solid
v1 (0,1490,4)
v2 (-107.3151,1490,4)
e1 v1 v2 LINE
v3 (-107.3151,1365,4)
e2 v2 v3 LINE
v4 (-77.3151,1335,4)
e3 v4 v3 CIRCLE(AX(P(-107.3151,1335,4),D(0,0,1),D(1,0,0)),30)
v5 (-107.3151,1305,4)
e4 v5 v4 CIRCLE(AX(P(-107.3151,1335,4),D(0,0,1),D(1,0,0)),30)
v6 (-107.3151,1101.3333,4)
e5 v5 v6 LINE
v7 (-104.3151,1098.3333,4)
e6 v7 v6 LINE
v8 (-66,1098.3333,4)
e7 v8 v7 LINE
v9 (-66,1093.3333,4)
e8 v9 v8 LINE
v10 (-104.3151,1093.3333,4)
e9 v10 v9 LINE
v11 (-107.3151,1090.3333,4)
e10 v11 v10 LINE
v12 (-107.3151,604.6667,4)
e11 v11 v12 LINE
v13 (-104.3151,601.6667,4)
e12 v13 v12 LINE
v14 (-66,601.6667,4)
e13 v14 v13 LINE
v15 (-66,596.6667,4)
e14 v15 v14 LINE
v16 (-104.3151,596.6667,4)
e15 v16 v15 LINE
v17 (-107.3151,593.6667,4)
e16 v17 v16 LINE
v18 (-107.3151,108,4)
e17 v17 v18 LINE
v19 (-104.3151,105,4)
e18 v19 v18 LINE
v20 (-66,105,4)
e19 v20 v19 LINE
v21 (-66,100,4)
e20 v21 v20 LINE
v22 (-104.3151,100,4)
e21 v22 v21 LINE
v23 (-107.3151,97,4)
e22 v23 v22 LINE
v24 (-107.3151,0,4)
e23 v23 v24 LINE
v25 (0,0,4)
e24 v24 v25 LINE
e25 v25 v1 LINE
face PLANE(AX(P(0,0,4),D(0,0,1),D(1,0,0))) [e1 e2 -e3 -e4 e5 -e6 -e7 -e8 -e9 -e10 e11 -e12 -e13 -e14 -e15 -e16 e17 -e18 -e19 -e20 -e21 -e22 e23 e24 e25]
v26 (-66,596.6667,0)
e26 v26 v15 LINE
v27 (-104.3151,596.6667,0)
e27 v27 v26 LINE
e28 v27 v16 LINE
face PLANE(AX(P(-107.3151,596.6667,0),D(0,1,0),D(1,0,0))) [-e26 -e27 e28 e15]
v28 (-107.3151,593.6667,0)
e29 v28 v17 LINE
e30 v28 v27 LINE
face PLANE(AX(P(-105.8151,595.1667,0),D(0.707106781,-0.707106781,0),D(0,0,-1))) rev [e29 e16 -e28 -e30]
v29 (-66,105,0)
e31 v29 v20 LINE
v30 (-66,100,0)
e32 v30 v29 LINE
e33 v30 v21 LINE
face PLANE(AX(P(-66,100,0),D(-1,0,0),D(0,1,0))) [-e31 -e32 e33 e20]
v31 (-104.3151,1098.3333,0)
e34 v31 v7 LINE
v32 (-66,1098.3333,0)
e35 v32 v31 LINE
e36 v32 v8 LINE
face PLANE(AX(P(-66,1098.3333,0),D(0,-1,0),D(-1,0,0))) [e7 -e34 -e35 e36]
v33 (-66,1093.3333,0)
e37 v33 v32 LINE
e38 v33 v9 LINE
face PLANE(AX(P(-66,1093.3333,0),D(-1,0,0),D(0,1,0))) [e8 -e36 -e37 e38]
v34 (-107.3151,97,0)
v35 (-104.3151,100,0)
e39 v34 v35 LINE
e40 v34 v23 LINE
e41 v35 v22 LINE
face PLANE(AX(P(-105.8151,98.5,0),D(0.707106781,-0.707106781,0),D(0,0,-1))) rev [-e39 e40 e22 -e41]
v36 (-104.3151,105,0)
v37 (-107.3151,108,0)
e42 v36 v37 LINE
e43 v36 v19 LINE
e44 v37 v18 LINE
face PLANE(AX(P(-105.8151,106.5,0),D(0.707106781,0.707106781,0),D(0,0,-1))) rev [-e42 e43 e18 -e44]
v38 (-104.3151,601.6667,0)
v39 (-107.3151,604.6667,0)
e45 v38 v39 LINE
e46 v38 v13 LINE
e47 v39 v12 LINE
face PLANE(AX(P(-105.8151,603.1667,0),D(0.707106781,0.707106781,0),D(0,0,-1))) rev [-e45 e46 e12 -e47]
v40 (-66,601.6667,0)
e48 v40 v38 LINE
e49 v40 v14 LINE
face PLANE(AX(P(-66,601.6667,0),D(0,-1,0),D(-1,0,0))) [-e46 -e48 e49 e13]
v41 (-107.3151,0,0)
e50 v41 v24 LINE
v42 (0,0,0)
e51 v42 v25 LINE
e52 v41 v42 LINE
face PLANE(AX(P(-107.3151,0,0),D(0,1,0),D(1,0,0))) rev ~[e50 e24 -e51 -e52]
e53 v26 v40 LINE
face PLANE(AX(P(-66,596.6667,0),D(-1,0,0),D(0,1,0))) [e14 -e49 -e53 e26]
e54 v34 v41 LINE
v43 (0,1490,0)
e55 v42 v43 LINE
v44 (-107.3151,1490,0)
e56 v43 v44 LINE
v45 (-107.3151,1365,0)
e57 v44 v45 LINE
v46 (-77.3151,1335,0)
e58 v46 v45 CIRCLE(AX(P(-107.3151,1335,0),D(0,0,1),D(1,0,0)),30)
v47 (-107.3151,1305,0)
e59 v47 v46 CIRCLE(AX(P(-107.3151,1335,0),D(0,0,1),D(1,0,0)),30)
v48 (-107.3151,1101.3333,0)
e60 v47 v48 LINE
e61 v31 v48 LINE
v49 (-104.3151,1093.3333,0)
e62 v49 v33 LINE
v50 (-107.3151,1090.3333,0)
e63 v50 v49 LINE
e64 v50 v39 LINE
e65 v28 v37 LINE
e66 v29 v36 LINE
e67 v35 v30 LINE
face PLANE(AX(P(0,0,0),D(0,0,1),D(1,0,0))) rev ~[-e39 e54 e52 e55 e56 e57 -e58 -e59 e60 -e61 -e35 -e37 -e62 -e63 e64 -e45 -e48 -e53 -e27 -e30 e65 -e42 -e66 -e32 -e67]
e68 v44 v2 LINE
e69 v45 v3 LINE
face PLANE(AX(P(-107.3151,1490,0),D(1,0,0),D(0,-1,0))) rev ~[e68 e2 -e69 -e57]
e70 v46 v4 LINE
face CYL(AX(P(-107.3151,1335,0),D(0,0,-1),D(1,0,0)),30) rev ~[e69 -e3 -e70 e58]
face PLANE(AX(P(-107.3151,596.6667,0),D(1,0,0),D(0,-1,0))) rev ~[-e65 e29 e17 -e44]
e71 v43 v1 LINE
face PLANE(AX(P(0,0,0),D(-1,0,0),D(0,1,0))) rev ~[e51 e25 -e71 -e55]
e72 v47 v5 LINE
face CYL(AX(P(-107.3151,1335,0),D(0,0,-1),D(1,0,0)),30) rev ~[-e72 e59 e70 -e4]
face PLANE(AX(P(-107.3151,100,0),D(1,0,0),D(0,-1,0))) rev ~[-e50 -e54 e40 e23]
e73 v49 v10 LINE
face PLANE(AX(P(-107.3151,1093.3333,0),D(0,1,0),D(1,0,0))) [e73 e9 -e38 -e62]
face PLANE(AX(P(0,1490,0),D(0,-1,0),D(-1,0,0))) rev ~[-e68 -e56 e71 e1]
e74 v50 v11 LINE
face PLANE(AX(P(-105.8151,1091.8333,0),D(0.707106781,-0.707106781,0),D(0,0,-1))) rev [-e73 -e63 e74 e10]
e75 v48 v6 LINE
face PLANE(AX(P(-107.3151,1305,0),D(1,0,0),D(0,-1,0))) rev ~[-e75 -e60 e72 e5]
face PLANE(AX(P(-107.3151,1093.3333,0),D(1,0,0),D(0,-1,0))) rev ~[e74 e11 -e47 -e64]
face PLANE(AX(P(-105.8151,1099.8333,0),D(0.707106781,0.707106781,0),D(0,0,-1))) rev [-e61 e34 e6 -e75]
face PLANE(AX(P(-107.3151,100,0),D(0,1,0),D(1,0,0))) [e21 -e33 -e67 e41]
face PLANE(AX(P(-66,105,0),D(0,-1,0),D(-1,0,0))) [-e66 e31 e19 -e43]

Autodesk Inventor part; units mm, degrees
ref_plane "YZ Plane" through (0, 0, 0) normal (1, 0, 0) x (0, 1, 0)
ref_plane "XZ Plane" through (0, 0, 0) normal (0, 1, 0) x (-1, 0, 0)
ref_plane "XY Plane" through (0, 0, 0) normal (0, 0, 1) x (1, 0, 0)
sketch "Sketch1" plane through (0, 0, 0) normal (0, 0, 1) x (1, 0, 0)
  line L0 (0, 1490) -> (-107.3151, 1490)
  line L1 (-107.3151, 1490) -> (-107.3151, 0)
  line L2 (-107.3151, 0) -> (0, 0)
  line L3 (0, 0) -> (0, 1490)
  line L4 (-107.3151, 100) -> (-66, 100)
  line L5 (-66, 100) -> (-66, 105)
  line L6 (-66, 105) -> (-107.3151, 105)
  line L7 (-107.3151, 105) -> (-107.3151, 100)
  line L8 (-107.3151, 596.6667) -> (-66, 596.6667)
  line L9 (-66, 596.6667) -> (-66, 601.6667)
  line L10 (-66, 601.6667) -> (-107.3151, 601.6667)
  line L11 (-107.3151, 601.6667) -> (-107.3151, 596.6667)
  line L12 (-107.3151, 1093.3333) -> (-66, 1093.3333)
  line L13 (-66, 1093.3333) -> (-66, 1098.3333)
  line L14 (-66, 1098.3333) -> (-107.3151, 1098.3333)
  line L15 (-107.3151, 1098.3333) -> (-107.3151, 1093.3333)
  circle A0 centre (-107.3151, 1335) radius 30
  point P0 (-107.3151, 1098.3333)
  point P1 (-107.3151, 1093.3333)
  point P2 (-107.3151, 601.6667)
  point P3 (-107.3151, 596.6667)
  point P4 (-107.3151, 105)
  point P5 (-107.3151, 1365)
  point P6 (-107.3151, 1305)
  dimension "d0" = 1490
  dimension "d1" = 107.3151
  dimension "d2" = 5
  dimension "d4" = 100
  dimension "d7" = 496.6667
  dimension "d23" = 66
  dimension "d29" = 60
  dimension "d30" = 1335
extrude "Plate1" add sketch "Sketch1" along normal blind 4 contours L3 L2 L1 L4 L5 L6 L8 L9 L10 L12 L13 L14 A0 L0
chamfer "Corner Chamfer1" distance 3 angle 45 6 edges at (-107.3151, 100, 2) (-107.3151, 105, 2) (-107.3151, 596.6667, 2) (-107.3151, 601.6667, 2) (-107.3151, 1098.3333, 2) (-107.3151, 1093.3333, 2)
equation "\"d0\" = Стрингер_длина"
equation "\"d1\" = стрингер_глубина_8"
equation "\"d2\" = паз_под_стрингер_толщина"
equation "\"d7\" = Шаг_шпангоутов"
equation "\"d23\" = паз_под_стрингер_глубина - Thickness"
equation "\"d29\" = 2 * радиус_выреза_под_сварку"
equation "\"d12\" = Thickness"
equation "\"BendRadius\" = Thickness"
equation "\"BendReliefWidth\" = Thickness"
equation "\"BendReliefDepth\" = 0.5 * Thickness"
equation "\"CornerReliefSize\" = 4 * Thickness"
equation "\"MinimumRemnant\" = 2 * Thickness"
equation "\"TransitionRadius\" = BendRadius"
equation "\"JacobiRadiusSize\" = BendRadius"
equation "\"GapSize\" = Thickness"
equation "\"Стрингер_длина\" = 1490"
equation "\"стрингер_глубина_8\" = 107.315065"
equation "\"паз_под_стрингер_толщина\" = 5"
equation "\"Шаг_шпангоутов\" = 496.666667"
equation "\"паз_под_стрингер_глубина\" = 70"
equation "\"Thickness\" = 4"
equation "\"радиус_выреза_под_сварку\" = 30"
properties part number "GBK 3303 stringer 8" material "Steel"
